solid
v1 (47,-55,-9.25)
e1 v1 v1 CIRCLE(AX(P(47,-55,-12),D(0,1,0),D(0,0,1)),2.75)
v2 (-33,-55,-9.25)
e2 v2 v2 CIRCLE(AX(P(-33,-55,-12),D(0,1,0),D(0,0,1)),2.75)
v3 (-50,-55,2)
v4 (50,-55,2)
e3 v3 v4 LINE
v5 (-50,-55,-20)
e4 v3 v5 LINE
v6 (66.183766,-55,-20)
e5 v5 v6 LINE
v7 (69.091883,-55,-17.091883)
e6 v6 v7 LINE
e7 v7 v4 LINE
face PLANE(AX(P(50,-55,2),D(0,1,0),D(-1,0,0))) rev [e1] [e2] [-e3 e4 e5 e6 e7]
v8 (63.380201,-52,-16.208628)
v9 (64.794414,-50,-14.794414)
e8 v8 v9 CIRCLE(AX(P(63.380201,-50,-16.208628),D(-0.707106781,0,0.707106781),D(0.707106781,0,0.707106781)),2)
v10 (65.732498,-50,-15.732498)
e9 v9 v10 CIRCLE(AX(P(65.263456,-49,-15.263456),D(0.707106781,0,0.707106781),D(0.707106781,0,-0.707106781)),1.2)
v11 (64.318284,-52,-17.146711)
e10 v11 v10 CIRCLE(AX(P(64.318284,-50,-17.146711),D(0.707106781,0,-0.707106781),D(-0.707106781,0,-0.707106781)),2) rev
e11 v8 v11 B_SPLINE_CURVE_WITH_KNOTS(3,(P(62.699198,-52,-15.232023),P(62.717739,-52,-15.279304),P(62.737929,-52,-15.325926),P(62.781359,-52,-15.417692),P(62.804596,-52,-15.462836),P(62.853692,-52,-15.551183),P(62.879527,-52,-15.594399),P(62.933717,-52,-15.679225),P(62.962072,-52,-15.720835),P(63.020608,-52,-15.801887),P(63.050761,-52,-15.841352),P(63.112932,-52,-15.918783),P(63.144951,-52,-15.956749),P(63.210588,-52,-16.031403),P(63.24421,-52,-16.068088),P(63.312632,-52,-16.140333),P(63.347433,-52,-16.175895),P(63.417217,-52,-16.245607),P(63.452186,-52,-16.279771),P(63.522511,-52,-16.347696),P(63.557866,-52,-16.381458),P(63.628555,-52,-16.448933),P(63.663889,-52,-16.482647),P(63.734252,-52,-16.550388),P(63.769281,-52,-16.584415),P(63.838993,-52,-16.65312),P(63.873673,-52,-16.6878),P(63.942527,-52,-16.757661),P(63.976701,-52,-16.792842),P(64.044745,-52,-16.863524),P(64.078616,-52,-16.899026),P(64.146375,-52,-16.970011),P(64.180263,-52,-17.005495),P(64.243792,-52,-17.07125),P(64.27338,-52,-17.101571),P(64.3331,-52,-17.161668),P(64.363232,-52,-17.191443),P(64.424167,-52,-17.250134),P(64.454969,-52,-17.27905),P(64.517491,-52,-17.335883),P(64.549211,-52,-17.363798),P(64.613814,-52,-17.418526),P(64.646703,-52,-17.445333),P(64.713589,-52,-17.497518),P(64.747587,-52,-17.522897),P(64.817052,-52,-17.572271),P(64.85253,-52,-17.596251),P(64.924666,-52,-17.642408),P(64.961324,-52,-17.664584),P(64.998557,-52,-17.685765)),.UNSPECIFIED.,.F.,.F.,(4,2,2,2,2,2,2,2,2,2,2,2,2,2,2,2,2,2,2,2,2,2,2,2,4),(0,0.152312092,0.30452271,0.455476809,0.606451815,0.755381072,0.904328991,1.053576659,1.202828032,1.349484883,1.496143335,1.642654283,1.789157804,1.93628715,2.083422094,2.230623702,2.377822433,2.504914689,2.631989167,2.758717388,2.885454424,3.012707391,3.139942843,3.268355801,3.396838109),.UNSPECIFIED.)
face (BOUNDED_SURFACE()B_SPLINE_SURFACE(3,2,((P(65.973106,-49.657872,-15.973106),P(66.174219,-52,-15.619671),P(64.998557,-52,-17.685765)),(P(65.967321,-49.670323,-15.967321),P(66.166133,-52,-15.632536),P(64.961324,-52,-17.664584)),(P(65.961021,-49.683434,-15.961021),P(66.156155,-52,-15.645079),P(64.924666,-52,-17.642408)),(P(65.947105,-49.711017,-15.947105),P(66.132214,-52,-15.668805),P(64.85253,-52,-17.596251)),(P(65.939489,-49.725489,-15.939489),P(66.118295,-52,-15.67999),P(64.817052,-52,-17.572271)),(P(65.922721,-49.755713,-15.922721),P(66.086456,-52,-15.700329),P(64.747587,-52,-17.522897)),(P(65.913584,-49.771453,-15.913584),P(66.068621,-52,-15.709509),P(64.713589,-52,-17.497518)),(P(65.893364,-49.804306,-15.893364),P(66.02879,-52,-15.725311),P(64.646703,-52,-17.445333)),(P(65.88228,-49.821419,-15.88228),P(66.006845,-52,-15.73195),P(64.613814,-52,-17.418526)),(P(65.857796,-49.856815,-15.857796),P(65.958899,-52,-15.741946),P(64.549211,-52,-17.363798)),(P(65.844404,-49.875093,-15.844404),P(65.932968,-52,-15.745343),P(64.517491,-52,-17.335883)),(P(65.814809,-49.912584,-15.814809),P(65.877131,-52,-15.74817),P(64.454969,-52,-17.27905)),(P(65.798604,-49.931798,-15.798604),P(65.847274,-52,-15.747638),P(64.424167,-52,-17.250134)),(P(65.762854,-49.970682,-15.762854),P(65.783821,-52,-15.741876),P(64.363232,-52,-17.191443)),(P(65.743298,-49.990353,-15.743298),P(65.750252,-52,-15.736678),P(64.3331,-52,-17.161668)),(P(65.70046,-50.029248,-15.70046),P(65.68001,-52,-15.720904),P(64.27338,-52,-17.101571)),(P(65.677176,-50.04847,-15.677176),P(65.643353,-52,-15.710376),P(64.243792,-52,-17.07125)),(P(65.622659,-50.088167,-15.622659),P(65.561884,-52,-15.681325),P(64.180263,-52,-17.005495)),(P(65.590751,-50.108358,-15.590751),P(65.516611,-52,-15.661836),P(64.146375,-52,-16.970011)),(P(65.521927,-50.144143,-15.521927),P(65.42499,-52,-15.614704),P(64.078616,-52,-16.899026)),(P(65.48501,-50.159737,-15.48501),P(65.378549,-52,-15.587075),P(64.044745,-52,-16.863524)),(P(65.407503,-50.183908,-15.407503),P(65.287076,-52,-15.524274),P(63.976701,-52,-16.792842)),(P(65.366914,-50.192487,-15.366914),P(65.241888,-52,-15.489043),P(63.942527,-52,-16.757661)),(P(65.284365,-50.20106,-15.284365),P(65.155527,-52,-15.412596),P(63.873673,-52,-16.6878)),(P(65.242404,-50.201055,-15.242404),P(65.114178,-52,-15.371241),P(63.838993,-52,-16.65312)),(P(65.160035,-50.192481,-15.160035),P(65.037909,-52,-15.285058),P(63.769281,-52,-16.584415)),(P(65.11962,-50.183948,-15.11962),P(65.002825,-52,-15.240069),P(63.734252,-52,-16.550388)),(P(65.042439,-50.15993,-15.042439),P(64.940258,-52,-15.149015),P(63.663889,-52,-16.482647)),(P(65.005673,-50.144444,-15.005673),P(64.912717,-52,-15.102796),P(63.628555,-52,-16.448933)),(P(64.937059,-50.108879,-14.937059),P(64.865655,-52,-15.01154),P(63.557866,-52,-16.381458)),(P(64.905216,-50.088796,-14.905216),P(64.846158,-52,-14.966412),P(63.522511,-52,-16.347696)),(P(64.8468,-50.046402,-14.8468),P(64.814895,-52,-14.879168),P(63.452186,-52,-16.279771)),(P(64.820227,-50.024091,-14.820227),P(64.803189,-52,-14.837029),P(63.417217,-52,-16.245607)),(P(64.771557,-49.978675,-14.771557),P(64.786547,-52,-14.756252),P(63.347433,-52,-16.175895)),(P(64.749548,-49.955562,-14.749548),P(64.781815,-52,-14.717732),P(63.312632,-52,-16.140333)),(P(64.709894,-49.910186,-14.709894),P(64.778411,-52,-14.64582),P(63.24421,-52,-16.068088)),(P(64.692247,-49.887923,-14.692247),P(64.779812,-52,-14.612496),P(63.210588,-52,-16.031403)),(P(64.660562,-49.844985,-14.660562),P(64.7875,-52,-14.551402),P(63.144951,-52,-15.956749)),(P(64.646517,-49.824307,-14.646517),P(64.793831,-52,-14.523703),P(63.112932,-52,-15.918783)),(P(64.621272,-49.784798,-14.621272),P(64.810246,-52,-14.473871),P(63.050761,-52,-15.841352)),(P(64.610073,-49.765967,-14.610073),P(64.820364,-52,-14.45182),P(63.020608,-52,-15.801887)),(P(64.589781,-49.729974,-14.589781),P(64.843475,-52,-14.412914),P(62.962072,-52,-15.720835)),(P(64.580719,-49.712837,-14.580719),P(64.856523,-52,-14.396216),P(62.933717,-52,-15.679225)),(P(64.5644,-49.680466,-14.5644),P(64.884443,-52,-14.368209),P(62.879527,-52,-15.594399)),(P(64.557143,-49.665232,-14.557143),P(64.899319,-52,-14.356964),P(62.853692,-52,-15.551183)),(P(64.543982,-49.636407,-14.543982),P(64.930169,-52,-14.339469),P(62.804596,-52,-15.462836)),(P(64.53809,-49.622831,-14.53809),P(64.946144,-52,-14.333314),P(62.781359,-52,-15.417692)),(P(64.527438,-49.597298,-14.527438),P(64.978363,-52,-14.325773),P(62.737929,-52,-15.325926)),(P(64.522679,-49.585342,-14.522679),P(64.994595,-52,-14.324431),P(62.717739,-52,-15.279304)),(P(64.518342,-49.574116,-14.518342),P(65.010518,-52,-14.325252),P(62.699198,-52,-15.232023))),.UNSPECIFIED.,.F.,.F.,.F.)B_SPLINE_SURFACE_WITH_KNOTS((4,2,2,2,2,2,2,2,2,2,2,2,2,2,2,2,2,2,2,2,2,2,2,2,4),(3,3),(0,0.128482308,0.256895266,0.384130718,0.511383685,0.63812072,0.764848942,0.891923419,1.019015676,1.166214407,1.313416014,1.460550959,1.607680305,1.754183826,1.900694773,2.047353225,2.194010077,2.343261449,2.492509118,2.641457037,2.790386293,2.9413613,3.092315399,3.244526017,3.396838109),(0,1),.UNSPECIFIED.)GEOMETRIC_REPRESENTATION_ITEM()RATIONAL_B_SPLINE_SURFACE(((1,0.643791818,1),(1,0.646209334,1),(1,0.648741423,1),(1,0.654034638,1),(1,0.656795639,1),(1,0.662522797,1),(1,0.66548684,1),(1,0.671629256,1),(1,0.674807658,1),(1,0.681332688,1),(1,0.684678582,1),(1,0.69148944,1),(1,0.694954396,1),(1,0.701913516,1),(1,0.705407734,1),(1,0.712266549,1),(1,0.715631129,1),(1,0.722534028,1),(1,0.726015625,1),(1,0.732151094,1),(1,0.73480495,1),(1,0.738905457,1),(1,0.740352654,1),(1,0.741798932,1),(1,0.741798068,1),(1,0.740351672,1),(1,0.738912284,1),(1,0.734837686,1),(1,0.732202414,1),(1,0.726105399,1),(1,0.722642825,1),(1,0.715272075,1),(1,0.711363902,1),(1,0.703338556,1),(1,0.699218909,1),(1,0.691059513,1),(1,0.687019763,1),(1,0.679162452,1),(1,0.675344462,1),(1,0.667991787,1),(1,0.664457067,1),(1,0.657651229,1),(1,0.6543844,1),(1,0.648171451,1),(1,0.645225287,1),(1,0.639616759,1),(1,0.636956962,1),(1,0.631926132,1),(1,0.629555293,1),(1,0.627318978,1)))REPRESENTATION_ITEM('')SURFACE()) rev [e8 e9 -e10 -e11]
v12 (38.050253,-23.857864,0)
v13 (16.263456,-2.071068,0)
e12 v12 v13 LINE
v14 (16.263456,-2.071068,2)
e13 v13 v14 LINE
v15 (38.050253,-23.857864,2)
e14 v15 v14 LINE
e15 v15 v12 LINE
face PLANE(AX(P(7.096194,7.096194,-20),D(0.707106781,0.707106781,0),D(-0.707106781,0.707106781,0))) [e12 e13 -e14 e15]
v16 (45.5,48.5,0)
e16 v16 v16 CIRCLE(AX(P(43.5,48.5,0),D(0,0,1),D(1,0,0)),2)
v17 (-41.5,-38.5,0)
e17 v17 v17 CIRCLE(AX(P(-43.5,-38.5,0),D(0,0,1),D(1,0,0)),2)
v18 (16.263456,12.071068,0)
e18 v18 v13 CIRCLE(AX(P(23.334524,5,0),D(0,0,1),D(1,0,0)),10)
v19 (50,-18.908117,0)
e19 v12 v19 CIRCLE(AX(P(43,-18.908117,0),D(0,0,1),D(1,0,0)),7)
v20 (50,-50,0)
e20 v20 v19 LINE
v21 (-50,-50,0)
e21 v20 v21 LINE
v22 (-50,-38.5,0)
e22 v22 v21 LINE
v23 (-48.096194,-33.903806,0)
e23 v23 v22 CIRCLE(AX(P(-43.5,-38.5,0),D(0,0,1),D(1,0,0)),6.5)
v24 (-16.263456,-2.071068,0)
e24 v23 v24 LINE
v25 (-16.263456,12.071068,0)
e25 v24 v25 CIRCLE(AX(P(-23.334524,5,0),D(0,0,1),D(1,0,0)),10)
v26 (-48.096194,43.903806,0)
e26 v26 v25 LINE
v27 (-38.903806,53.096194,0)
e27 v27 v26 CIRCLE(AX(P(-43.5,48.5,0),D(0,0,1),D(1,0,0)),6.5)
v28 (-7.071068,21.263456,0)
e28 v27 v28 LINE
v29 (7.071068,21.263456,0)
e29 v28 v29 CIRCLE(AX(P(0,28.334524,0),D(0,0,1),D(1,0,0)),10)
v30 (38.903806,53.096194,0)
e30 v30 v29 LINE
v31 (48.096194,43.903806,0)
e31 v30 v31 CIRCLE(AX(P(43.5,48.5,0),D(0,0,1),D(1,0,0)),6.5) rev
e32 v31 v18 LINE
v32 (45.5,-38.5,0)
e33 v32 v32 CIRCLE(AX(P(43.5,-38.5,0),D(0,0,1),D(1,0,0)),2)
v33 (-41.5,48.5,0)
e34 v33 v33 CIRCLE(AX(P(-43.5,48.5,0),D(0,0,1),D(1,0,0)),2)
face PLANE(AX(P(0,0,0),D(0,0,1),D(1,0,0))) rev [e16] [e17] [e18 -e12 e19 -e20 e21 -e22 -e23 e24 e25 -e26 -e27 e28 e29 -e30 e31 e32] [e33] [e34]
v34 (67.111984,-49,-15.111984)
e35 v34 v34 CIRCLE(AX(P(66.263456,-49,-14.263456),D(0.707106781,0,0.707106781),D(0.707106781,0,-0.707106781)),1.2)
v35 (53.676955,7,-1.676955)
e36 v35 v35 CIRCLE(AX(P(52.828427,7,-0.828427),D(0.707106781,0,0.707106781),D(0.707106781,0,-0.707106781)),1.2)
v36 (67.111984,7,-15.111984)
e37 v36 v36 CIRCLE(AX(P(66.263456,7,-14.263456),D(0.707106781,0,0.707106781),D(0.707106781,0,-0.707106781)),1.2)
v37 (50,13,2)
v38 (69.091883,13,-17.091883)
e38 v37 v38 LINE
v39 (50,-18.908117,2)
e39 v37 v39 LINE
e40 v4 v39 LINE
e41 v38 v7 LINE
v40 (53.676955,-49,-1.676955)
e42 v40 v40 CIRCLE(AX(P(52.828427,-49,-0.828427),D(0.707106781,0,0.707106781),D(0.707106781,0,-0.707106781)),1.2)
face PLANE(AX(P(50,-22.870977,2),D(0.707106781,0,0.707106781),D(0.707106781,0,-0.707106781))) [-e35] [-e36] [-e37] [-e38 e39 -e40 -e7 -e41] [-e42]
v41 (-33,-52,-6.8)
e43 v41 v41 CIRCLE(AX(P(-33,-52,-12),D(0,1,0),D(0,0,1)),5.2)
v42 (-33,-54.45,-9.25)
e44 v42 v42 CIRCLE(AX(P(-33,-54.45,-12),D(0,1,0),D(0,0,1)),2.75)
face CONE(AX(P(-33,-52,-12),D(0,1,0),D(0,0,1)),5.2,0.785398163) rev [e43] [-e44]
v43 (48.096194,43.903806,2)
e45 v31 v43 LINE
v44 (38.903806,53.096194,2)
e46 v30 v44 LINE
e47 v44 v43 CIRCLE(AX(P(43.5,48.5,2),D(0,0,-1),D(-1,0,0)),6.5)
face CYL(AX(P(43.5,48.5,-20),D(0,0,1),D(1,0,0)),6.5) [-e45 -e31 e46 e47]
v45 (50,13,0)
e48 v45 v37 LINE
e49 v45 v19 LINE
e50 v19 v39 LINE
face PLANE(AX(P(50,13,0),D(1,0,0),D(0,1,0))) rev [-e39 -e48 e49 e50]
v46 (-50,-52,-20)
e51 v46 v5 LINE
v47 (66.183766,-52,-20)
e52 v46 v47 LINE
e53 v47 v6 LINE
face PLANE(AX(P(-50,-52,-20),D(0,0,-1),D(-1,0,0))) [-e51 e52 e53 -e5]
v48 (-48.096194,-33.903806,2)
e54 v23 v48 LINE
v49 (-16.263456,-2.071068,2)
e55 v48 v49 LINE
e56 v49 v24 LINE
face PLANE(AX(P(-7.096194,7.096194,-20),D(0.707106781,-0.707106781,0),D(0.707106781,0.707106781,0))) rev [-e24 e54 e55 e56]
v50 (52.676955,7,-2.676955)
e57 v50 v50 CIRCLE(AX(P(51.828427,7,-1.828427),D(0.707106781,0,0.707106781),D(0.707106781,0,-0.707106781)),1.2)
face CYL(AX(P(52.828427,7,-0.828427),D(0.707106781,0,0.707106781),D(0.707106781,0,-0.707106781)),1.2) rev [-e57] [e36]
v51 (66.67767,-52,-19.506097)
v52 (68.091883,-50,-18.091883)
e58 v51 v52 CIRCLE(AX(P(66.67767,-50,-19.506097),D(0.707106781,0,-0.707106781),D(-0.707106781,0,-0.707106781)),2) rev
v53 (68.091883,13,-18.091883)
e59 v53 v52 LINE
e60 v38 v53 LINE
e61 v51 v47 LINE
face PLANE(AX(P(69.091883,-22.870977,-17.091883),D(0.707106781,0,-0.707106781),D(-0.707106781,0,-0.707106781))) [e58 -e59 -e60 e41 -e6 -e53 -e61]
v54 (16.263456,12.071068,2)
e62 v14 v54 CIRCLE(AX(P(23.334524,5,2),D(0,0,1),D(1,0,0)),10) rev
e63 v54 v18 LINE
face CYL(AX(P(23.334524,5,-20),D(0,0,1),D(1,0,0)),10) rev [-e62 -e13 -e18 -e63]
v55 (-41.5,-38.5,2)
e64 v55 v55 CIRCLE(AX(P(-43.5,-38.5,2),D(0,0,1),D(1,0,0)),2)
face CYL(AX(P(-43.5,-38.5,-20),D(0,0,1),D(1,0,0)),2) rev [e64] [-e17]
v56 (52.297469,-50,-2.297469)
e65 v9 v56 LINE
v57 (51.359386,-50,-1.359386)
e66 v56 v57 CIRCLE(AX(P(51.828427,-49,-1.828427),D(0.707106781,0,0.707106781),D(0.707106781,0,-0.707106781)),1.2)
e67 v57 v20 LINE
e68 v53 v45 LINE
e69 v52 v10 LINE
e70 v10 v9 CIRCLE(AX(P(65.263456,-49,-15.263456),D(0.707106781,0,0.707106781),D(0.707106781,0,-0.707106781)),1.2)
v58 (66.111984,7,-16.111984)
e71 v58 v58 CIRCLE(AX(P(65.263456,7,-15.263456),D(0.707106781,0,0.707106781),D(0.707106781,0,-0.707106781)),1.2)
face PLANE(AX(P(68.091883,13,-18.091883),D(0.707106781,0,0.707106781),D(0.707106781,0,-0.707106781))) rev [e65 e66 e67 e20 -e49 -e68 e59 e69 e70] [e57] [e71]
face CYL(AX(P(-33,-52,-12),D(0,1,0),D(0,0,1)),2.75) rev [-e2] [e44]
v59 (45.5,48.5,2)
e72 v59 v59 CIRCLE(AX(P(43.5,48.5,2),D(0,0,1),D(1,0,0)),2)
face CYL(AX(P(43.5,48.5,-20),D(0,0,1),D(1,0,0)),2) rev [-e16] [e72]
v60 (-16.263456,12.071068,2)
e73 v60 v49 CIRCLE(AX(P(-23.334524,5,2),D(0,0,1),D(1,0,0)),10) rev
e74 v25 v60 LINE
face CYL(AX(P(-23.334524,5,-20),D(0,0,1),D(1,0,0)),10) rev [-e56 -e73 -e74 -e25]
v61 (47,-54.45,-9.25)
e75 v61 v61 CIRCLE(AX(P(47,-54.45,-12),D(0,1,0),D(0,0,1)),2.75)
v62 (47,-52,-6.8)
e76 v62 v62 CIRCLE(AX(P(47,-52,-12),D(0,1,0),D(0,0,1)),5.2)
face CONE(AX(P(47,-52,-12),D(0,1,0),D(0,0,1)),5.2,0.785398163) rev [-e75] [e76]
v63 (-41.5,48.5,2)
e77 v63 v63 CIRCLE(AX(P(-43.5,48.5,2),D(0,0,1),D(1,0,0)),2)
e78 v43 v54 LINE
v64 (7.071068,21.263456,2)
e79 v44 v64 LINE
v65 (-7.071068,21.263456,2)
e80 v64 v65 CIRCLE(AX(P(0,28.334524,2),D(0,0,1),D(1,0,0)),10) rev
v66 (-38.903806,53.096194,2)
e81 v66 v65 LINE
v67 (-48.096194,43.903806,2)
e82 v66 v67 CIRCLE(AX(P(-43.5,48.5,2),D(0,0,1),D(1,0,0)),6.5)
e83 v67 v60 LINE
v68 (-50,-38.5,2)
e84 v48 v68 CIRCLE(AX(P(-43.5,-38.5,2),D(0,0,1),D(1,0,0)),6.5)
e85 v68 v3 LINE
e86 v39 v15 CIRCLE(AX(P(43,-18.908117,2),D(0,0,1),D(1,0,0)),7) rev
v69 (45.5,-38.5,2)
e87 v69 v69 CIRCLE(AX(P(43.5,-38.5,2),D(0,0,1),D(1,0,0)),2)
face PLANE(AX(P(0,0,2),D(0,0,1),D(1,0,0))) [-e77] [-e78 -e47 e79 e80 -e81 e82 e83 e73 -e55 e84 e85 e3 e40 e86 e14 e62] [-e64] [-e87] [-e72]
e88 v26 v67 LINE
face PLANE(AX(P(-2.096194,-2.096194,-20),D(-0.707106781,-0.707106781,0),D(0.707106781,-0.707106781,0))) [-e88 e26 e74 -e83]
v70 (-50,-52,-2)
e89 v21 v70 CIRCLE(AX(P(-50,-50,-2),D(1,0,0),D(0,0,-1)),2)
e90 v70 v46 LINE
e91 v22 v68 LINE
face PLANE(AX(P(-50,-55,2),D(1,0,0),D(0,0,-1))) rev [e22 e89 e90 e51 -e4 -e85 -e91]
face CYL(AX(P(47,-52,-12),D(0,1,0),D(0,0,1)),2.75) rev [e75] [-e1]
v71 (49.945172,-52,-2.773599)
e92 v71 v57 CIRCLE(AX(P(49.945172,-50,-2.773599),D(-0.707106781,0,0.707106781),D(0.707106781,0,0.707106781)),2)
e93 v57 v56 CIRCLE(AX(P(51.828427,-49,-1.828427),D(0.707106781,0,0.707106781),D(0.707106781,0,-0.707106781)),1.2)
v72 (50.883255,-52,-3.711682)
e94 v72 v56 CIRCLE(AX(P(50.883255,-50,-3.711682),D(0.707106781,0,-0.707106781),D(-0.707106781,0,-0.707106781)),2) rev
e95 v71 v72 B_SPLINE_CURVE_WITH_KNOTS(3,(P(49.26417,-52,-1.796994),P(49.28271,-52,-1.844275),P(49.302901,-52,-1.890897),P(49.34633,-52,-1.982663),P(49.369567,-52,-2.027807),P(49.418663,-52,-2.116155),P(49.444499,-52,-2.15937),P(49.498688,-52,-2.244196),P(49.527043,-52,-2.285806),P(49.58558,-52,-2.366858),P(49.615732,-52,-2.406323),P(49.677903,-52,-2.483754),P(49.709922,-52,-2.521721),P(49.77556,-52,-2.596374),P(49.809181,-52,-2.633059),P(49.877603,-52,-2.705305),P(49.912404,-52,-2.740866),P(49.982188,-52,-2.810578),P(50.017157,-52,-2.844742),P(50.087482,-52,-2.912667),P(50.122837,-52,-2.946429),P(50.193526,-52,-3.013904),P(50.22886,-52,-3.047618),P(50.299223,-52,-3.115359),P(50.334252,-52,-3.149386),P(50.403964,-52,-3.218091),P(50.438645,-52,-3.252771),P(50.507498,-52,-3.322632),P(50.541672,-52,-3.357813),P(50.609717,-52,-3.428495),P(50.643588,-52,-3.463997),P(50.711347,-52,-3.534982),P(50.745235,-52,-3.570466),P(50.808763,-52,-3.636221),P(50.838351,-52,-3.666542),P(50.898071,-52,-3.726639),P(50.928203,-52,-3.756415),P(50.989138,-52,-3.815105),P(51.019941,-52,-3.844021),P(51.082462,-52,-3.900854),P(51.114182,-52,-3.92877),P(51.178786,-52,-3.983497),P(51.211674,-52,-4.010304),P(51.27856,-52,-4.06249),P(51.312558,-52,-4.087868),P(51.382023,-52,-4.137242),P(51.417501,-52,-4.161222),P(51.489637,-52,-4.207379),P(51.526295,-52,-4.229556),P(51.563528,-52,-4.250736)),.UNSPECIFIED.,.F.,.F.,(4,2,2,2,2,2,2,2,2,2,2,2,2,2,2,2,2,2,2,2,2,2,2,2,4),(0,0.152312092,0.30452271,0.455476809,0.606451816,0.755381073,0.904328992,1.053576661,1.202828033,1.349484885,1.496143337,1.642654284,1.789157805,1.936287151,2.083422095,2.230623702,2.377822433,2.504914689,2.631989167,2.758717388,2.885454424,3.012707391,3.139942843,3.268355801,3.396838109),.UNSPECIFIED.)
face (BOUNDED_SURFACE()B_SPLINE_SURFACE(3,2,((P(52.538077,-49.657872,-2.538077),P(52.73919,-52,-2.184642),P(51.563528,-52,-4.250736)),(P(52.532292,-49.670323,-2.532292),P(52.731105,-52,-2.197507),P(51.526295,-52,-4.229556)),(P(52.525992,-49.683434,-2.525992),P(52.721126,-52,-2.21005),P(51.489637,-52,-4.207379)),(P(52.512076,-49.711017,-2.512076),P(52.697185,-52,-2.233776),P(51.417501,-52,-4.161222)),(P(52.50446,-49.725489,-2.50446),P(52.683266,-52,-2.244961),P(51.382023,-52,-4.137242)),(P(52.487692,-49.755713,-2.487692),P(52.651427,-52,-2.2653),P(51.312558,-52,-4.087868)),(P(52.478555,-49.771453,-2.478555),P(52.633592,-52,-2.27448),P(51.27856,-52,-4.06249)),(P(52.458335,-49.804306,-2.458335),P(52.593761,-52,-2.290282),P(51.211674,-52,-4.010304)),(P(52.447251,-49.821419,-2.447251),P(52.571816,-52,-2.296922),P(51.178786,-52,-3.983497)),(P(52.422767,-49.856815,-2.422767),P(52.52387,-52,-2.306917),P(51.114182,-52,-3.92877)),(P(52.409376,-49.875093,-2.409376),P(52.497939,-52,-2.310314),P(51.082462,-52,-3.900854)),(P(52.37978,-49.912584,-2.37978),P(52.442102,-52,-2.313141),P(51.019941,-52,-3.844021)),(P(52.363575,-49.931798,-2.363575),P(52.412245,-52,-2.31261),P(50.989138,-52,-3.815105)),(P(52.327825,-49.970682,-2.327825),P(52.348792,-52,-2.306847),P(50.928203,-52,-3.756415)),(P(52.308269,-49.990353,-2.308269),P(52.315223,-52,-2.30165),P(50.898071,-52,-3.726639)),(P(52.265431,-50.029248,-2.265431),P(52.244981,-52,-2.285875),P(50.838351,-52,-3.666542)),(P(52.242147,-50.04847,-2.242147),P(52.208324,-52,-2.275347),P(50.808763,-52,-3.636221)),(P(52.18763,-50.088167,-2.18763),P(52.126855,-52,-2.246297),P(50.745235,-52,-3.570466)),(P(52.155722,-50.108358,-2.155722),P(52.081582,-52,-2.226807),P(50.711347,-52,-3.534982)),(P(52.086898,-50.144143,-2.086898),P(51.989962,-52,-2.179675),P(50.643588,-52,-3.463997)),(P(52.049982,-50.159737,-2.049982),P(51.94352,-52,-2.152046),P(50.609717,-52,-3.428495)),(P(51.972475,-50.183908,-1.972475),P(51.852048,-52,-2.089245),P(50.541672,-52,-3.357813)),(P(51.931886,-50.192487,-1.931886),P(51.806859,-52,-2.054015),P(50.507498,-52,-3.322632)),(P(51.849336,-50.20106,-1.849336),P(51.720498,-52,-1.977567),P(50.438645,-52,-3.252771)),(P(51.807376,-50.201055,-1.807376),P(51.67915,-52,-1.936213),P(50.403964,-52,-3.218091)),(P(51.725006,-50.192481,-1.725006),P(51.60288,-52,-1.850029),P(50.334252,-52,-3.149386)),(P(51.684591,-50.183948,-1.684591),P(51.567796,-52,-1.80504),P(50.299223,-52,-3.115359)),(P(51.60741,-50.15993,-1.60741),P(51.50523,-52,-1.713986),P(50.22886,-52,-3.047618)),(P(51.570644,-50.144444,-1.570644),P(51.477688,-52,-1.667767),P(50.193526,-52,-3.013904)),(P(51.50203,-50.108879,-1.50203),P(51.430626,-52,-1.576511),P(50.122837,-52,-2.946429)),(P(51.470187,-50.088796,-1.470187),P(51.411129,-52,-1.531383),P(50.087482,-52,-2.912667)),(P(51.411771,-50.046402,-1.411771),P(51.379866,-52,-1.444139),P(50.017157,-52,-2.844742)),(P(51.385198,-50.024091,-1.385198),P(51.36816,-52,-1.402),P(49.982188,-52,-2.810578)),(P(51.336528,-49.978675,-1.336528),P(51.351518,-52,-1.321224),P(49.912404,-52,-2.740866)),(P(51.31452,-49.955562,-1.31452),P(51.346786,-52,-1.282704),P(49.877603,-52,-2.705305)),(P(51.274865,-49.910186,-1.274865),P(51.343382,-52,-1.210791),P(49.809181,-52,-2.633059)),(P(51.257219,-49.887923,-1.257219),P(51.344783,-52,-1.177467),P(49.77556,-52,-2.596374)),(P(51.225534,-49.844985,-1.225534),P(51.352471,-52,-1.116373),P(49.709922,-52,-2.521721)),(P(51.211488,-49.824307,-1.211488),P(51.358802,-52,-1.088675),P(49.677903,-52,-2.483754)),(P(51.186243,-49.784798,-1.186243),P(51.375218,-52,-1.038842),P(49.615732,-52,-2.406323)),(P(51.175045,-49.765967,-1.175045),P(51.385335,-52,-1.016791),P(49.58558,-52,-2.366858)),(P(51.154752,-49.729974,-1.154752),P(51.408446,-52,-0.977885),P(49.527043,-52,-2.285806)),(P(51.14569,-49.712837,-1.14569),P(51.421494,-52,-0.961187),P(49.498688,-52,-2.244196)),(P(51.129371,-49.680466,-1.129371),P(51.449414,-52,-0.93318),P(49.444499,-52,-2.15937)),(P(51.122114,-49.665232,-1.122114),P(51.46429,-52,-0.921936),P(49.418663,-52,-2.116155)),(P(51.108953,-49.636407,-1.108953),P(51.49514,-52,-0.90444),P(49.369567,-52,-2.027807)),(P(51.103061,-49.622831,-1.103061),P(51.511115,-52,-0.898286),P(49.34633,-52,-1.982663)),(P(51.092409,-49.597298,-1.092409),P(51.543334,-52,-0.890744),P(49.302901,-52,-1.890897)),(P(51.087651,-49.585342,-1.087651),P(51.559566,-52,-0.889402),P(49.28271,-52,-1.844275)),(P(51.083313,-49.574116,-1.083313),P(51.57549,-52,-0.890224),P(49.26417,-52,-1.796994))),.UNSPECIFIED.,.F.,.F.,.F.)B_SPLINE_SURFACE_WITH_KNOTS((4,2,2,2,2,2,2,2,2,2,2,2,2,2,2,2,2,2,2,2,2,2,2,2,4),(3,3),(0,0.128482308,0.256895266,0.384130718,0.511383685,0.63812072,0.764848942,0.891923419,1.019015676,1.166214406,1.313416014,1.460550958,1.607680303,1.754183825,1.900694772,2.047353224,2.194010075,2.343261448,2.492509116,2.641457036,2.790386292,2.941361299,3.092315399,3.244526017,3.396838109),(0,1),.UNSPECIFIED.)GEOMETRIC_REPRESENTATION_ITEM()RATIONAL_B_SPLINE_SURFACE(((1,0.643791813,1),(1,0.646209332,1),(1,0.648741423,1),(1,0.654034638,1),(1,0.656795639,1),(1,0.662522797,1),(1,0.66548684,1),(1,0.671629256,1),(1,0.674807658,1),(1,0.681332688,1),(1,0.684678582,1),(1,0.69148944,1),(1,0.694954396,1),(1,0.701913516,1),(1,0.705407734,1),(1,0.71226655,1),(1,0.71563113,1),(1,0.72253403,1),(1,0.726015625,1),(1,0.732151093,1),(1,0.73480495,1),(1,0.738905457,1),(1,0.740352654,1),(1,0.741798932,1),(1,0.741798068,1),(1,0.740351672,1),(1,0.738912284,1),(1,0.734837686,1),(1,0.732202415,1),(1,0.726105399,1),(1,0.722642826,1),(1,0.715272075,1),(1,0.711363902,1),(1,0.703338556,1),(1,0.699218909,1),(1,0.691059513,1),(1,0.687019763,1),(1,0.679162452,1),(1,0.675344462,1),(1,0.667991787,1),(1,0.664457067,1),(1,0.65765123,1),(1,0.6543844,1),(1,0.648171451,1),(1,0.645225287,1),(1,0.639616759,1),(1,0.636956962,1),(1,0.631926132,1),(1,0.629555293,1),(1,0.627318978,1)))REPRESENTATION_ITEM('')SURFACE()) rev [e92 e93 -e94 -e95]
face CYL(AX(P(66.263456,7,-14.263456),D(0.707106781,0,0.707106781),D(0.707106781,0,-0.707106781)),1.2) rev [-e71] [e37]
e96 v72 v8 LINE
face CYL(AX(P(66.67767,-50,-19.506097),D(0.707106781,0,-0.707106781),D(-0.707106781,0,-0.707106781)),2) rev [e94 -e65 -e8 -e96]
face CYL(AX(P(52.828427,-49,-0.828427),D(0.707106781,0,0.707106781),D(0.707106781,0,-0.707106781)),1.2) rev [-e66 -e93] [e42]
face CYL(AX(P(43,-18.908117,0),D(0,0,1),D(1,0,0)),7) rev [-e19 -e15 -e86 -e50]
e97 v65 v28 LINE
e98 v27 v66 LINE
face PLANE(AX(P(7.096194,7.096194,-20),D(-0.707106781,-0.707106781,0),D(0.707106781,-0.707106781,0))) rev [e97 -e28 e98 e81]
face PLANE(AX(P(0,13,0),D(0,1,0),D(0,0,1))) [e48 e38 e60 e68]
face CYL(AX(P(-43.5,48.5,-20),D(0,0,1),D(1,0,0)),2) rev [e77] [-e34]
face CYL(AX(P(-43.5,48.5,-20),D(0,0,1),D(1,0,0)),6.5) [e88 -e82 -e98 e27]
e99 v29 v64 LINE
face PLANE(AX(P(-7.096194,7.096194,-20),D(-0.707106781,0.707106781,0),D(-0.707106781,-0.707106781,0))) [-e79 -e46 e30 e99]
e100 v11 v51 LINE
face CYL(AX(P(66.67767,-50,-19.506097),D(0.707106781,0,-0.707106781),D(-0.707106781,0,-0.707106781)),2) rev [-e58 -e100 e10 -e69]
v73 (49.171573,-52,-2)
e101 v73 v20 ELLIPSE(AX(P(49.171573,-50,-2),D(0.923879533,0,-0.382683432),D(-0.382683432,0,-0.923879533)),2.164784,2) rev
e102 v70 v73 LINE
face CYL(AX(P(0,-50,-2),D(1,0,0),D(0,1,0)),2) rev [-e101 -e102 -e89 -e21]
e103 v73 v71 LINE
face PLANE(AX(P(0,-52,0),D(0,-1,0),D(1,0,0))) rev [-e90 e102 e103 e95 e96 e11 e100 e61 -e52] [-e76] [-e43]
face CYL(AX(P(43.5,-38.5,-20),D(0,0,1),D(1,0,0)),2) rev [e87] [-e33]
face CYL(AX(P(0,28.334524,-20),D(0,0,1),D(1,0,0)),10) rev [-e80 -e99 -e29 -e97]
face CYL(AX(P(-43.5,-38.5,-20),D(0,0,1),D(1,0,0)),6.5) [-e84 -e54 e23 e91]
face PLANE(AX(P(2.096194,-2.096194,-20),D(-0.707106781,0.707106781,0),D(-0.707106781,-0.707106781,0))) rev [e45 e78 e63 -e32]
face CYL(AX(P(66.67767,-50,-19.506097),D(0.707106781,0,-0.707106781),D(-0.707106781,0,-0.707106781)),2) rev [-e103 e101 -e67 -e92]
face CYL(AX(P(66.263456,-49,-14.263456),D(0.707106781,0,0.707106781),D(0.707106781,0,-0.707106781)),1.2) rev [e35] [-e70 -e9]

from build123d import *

# Parameters (mm, degrees)
ESQUISSE1_W                                 = 100
ESQUISSE1_H                                 = 110
BOSS_EXTRU_1_DEPTH                          = 2
ESQUISSE3_W                                 = 100
ESQUISSE3_H                                 = 20
BOSS_EXTRU_2_DEPTH                          = 3
ESQUISSE6_R                                 = 2
ENL_V_MAT_EXTRU_1_DEPTH                     = 78.517739905
ENL_V_MAT_EXTRU_2_DEPTH                     = 78.517739905
CONG_2_R                                    = 10
BOSS_EXTRU_3_DEPTH                          = 3
FRAISAGE_POUR_VIS_T_TE_FRAIS_E_M51_AT_COUNT = 2
FRAISAGE_POUR_VIS_T_TE_FRAIS_E_M51_AT_PITCH = 80
BOSS_EXTRU_4_DEPTH                          = 65
BOSS_EXTRU_5_DEPTH                          = 2
CONG_3_R                                    = 7
D_GAGEMENT_M21_D                            = 2.4
D_GAGEMENT_M21_ON_FACE_2_D                  = 2.4
CONG_1_R                                    = 2


with BuildPart() as part:
    # Esquisse1 → Boss.-Extru.1 (new body)
    with BuildSketch(Plane.XY):
        Rectangle(ESQUISSE1_W, ESQUISSE1_H)
    extrude(amount=BOSS_EXTRU_1_DEPTH)

    # Esquisse3 → Boss.-Extru.2 (add)
    with BuildSketch(Plane.XZ.offset(55)):
        with Locations((0, -10)):
            Rectangle(ESQUISSE3_W, ESQUISSE3_H)
    extrude(amount=-BOSS_EXTRU_2_DEPTH)

    # Esquisse6 → Enlèv. mat.-Extru.1 (cut, through all)
    with BuildSketch(Plane.XY.offset(2)):
        with Locations((-43.5, 48.5)):
            Circle(ESQUISSE6_R)
        with Locations((43.5, 48.5)):
            Circle(ESQUISSE6_R)
        with Locations((-43.5, -38.5)):
            Circle(ESQUISSE6_R)
        with Locations((43.5, -38.5)):
            Circle(ESQUISSE6_R)
    extrude(amount=-ENL_V_MAT_EXTRU_1_DEPTH, mode=Mode.SUBTRACT)

    # Esquisse7 → Enlèv. mat.-Extru.2 (cut, through all)
    with BuildSketch(Plane.XY.offset(2)):
        with BuildLine():
            Line((0, 55), (-43.500000007, 55))
            ThreePointArc((-43.500000007, 55), (-41.012557693, 54.505216963), (-38.903805922, 53.096194078))
            Line((-38.903805922, 53.096194078), (0, 14.192388155))
            Line((0, 14.192388155), (0, 55))
        make_face()
        with BuildLine():
            Line((-9.192388155, 5), (-48.096194078, 43.903805922))
            ThreePointArc((-48.096194078, 43.903805922), (-49.505216961, 46.01255769), (-50, 48.5))
            Line((-50, 48.5), (-50, -38.5))
            ThreePointArc((-50, -38.5), (-49.505216961, -36.01255769), (-48.096194078, -33.903805922))
            Line((-48.096194078, -33.903805922), (-9.192388155, 5))
        make_face()
        with BuildLine():
            Line((-50, 55), (-50, 48.5))
            ThreePointArc((-50, 48.5), (-48.09619408, 53.096194075), (-43.500000007, 55))
            Line((-43.500000007, 55), (-50, 55))
        make_face()
    enl_v_mat_extru_2 = extrude(amount=-ENL_V_MAT_EXTRU_2_DEPTH, mode=Mode.SUBTRACT)

    # Symétrie1: Enlèv. mat.-Extru.2 across plane
    add(enl_v_mat_extru_2.mirror(Plane(origin=(0, 0, 0), x_dir=(0, 0, 1), z_dir=(1, 0, 0))), mode=Mode.SUBTRACT)

    # Congé2
    cong_2_edges = [part.edges().sort_by_distance(p)[0] for p in [
        (9.192388155, 5, 1),
        (-9.192388155, 5, 1),
        (0, 14.192388155, 1),
    ]]
    fillet(cong_2_edges, radius=CONG_2_R)

    # Esquisse8 → Boss.-Extru.3 (add)
    with BuildSketch(Plane.XZ.offset(55)):
        Polygon((50, 2), (69.091883092, -17.091883092), (66.183766184, -20), (50, -20), align=None)
    extrude(amount=-BOSS_EXTRU_3_DEPTH)

    # Esquisse5 → Fraisage pour vis à tête fraisée M51 (revolve, cut)
    with BuildSketch(Plane(origin=(-33, -52, -12), x_dir=(0, 0, 1), z_dir=(1, 0, 0))):
        Polygon((0, 0), (0, 3), (2.75, 3), (2.75, 2.45), (5.2, 0), align=None)
    fraisage_pour_vis_t_te_frais_e_m51 = revolve(axis=Axis((-33, -45.65, -12), (0, -1, 0)), mode=Mode.SUBTRACT)

    # Fraisage pour vis à tête fraisée M51 at: Fraisage pour vis à tête fraisée M51 ×2
    with Locations(*[(i * FRAISAGE_POUR_VIS_T_TE_FRAIS_E_M51_AT_PITCH, 0, 0) for i in range(1, FRAISAGE_POUR_VIS_T_TE_FRAIS_E_M51_AT_COUNT)]):
        add(fraisage_pour_vis_t_te_frais_e_m51, mode=Mode.SUBTRACT)

    # Esquisse9 → Boss.-Extru.4 (add)
    with BuildSketch(Plane(origin=(0, -52, 0), x_dir=(1, 0, 0), z_dir=(0, 1, 0))):
        Polygon((50, -2), (69.091883092, 17.091883092), (68.091883092, 18.091883092), (50, 0), align=None)
    extrude(amount=BOSS_EXTRU_4_DEPTH)

    # Esquisse10 → Boss.-Extru.5 (add)
    with BuildSketch(Plane.XY.offset(2)):
        Polygon((48.096194078, -33.903805922), (50, -35.807611845), (50, -38.5), align=None)
    extrude(amount=-BOSS_EXTRU_5_DEPTH)

    # Congé3
    # the kernel refuses this fillet: 7 mm, written as the material it adds along each edge
    with BuildSketch(Plane(origin=(50, -35.807611845, 2), x_dir=(-0.707106781186548, 0.7071067811865469, 0), z_dir=(0, 0, -1))) as cong_3_piece_1_section:
        with BuildLine():
            CenterArc((CONG_3_R * 2.41421356237, CONG_3_R), CONG_3_R, 135, 135)
            Line((CONG_3_R * 1.70710678119, CONG_3_R * 1.70710678119), (0, 0))
            Line((0, 0), (CONG_3_R * 2.41421356237, 0))
        make_face()
    cong_3_piece_1 = extrude(amount=2, mode=Mode.PRIVATE)
    cong_3_piece_1 = split(cong_3_piece_1, bisect_by=Plane(origin=(49.112602223, -28.296939532, 0.887397777), z_dir=(0.7071067811865487, 0, 0.7071067811865464)), keep=Keep.TOP, mode=Mode.PRIVATE)
    cong_3_piece_1 = split(cong_3_piece_1, bisect_by=Plane(origin=(50.112602223, -28.296939532, 1.887397777), z_dir=(-0.7071067811865483, 0, -0.7071067811865467)), keep=Keep.TOP, mode=Mode.PRIVATE)
    add(cong_3_piece_1)
    with BuildSketch(Plane(origin=(50, -35.807611845, 2), x_dir=(-0.707106781186548, 0.7071067811865469, 0), z_dir=(0, 0, -1))) as cong_3_piece_2_section:
        with BuildLine():
            CenterArc((CONG_3_R * 2.41421356237, CONG_3_R), CONG_3_R, 135, 135)
            Line((CONG_3_R * 1.70710678119, CONG_3_R * 1.70710678119), (0, 0))
            Line((0, 0), (CONG_3_R * 2.41421356237, 0))
        make_face()
    cong_3_piece_2 = extrude(amount=2, mode=Mode.PRIVATE)
    cong_3_piece_2 = split(cong_3_piece_2, bisect_by=Plane(origin=(47.570771883, -28.332960354, 2.429228117), z_dir=(-0.7071067811865487, 0, -0.7071067811865464)), keep=Keep.TOP, mode=Mode.PRIVATE)
    add(cong_3_piece_2)

    # Dégagement M21 (through all)
    with Locations(Plane(origin=(52.828427125, 7, -0.828427125), x_dir=(-0.707106781187, 0, 0.707106781187), z_dir=(0.707106781187, 0, 0.707106781187))):
        with Locations((0, 0)):
            Hole(D_GAGEMENT_M21_D / 2)

    # Dégagement M21 on face 2 (through all)
    with Locations(Plane(origin=(66.263455967, 7, -14.263455967), x_dir=(0.707106781187, 0, -0.707106781187), z_dir=(0.707106781187, 0, 0.707106781187))):
        with Locations((0, 0), (0, -56), (-19, -56)):
            Hole(D_GAGEMENT_M21_ON_FACE_2_D / 2)

    # Congé1
    cong_1_edges = [part.edges().sort_by_distance(p)[0] for p in [
        (0, -52, 0),
        (59.045941546, -52, -9.045941546),
    ]]
    fillet(cong_1_edges, radius=CONG_1_R)


solid = part.part
